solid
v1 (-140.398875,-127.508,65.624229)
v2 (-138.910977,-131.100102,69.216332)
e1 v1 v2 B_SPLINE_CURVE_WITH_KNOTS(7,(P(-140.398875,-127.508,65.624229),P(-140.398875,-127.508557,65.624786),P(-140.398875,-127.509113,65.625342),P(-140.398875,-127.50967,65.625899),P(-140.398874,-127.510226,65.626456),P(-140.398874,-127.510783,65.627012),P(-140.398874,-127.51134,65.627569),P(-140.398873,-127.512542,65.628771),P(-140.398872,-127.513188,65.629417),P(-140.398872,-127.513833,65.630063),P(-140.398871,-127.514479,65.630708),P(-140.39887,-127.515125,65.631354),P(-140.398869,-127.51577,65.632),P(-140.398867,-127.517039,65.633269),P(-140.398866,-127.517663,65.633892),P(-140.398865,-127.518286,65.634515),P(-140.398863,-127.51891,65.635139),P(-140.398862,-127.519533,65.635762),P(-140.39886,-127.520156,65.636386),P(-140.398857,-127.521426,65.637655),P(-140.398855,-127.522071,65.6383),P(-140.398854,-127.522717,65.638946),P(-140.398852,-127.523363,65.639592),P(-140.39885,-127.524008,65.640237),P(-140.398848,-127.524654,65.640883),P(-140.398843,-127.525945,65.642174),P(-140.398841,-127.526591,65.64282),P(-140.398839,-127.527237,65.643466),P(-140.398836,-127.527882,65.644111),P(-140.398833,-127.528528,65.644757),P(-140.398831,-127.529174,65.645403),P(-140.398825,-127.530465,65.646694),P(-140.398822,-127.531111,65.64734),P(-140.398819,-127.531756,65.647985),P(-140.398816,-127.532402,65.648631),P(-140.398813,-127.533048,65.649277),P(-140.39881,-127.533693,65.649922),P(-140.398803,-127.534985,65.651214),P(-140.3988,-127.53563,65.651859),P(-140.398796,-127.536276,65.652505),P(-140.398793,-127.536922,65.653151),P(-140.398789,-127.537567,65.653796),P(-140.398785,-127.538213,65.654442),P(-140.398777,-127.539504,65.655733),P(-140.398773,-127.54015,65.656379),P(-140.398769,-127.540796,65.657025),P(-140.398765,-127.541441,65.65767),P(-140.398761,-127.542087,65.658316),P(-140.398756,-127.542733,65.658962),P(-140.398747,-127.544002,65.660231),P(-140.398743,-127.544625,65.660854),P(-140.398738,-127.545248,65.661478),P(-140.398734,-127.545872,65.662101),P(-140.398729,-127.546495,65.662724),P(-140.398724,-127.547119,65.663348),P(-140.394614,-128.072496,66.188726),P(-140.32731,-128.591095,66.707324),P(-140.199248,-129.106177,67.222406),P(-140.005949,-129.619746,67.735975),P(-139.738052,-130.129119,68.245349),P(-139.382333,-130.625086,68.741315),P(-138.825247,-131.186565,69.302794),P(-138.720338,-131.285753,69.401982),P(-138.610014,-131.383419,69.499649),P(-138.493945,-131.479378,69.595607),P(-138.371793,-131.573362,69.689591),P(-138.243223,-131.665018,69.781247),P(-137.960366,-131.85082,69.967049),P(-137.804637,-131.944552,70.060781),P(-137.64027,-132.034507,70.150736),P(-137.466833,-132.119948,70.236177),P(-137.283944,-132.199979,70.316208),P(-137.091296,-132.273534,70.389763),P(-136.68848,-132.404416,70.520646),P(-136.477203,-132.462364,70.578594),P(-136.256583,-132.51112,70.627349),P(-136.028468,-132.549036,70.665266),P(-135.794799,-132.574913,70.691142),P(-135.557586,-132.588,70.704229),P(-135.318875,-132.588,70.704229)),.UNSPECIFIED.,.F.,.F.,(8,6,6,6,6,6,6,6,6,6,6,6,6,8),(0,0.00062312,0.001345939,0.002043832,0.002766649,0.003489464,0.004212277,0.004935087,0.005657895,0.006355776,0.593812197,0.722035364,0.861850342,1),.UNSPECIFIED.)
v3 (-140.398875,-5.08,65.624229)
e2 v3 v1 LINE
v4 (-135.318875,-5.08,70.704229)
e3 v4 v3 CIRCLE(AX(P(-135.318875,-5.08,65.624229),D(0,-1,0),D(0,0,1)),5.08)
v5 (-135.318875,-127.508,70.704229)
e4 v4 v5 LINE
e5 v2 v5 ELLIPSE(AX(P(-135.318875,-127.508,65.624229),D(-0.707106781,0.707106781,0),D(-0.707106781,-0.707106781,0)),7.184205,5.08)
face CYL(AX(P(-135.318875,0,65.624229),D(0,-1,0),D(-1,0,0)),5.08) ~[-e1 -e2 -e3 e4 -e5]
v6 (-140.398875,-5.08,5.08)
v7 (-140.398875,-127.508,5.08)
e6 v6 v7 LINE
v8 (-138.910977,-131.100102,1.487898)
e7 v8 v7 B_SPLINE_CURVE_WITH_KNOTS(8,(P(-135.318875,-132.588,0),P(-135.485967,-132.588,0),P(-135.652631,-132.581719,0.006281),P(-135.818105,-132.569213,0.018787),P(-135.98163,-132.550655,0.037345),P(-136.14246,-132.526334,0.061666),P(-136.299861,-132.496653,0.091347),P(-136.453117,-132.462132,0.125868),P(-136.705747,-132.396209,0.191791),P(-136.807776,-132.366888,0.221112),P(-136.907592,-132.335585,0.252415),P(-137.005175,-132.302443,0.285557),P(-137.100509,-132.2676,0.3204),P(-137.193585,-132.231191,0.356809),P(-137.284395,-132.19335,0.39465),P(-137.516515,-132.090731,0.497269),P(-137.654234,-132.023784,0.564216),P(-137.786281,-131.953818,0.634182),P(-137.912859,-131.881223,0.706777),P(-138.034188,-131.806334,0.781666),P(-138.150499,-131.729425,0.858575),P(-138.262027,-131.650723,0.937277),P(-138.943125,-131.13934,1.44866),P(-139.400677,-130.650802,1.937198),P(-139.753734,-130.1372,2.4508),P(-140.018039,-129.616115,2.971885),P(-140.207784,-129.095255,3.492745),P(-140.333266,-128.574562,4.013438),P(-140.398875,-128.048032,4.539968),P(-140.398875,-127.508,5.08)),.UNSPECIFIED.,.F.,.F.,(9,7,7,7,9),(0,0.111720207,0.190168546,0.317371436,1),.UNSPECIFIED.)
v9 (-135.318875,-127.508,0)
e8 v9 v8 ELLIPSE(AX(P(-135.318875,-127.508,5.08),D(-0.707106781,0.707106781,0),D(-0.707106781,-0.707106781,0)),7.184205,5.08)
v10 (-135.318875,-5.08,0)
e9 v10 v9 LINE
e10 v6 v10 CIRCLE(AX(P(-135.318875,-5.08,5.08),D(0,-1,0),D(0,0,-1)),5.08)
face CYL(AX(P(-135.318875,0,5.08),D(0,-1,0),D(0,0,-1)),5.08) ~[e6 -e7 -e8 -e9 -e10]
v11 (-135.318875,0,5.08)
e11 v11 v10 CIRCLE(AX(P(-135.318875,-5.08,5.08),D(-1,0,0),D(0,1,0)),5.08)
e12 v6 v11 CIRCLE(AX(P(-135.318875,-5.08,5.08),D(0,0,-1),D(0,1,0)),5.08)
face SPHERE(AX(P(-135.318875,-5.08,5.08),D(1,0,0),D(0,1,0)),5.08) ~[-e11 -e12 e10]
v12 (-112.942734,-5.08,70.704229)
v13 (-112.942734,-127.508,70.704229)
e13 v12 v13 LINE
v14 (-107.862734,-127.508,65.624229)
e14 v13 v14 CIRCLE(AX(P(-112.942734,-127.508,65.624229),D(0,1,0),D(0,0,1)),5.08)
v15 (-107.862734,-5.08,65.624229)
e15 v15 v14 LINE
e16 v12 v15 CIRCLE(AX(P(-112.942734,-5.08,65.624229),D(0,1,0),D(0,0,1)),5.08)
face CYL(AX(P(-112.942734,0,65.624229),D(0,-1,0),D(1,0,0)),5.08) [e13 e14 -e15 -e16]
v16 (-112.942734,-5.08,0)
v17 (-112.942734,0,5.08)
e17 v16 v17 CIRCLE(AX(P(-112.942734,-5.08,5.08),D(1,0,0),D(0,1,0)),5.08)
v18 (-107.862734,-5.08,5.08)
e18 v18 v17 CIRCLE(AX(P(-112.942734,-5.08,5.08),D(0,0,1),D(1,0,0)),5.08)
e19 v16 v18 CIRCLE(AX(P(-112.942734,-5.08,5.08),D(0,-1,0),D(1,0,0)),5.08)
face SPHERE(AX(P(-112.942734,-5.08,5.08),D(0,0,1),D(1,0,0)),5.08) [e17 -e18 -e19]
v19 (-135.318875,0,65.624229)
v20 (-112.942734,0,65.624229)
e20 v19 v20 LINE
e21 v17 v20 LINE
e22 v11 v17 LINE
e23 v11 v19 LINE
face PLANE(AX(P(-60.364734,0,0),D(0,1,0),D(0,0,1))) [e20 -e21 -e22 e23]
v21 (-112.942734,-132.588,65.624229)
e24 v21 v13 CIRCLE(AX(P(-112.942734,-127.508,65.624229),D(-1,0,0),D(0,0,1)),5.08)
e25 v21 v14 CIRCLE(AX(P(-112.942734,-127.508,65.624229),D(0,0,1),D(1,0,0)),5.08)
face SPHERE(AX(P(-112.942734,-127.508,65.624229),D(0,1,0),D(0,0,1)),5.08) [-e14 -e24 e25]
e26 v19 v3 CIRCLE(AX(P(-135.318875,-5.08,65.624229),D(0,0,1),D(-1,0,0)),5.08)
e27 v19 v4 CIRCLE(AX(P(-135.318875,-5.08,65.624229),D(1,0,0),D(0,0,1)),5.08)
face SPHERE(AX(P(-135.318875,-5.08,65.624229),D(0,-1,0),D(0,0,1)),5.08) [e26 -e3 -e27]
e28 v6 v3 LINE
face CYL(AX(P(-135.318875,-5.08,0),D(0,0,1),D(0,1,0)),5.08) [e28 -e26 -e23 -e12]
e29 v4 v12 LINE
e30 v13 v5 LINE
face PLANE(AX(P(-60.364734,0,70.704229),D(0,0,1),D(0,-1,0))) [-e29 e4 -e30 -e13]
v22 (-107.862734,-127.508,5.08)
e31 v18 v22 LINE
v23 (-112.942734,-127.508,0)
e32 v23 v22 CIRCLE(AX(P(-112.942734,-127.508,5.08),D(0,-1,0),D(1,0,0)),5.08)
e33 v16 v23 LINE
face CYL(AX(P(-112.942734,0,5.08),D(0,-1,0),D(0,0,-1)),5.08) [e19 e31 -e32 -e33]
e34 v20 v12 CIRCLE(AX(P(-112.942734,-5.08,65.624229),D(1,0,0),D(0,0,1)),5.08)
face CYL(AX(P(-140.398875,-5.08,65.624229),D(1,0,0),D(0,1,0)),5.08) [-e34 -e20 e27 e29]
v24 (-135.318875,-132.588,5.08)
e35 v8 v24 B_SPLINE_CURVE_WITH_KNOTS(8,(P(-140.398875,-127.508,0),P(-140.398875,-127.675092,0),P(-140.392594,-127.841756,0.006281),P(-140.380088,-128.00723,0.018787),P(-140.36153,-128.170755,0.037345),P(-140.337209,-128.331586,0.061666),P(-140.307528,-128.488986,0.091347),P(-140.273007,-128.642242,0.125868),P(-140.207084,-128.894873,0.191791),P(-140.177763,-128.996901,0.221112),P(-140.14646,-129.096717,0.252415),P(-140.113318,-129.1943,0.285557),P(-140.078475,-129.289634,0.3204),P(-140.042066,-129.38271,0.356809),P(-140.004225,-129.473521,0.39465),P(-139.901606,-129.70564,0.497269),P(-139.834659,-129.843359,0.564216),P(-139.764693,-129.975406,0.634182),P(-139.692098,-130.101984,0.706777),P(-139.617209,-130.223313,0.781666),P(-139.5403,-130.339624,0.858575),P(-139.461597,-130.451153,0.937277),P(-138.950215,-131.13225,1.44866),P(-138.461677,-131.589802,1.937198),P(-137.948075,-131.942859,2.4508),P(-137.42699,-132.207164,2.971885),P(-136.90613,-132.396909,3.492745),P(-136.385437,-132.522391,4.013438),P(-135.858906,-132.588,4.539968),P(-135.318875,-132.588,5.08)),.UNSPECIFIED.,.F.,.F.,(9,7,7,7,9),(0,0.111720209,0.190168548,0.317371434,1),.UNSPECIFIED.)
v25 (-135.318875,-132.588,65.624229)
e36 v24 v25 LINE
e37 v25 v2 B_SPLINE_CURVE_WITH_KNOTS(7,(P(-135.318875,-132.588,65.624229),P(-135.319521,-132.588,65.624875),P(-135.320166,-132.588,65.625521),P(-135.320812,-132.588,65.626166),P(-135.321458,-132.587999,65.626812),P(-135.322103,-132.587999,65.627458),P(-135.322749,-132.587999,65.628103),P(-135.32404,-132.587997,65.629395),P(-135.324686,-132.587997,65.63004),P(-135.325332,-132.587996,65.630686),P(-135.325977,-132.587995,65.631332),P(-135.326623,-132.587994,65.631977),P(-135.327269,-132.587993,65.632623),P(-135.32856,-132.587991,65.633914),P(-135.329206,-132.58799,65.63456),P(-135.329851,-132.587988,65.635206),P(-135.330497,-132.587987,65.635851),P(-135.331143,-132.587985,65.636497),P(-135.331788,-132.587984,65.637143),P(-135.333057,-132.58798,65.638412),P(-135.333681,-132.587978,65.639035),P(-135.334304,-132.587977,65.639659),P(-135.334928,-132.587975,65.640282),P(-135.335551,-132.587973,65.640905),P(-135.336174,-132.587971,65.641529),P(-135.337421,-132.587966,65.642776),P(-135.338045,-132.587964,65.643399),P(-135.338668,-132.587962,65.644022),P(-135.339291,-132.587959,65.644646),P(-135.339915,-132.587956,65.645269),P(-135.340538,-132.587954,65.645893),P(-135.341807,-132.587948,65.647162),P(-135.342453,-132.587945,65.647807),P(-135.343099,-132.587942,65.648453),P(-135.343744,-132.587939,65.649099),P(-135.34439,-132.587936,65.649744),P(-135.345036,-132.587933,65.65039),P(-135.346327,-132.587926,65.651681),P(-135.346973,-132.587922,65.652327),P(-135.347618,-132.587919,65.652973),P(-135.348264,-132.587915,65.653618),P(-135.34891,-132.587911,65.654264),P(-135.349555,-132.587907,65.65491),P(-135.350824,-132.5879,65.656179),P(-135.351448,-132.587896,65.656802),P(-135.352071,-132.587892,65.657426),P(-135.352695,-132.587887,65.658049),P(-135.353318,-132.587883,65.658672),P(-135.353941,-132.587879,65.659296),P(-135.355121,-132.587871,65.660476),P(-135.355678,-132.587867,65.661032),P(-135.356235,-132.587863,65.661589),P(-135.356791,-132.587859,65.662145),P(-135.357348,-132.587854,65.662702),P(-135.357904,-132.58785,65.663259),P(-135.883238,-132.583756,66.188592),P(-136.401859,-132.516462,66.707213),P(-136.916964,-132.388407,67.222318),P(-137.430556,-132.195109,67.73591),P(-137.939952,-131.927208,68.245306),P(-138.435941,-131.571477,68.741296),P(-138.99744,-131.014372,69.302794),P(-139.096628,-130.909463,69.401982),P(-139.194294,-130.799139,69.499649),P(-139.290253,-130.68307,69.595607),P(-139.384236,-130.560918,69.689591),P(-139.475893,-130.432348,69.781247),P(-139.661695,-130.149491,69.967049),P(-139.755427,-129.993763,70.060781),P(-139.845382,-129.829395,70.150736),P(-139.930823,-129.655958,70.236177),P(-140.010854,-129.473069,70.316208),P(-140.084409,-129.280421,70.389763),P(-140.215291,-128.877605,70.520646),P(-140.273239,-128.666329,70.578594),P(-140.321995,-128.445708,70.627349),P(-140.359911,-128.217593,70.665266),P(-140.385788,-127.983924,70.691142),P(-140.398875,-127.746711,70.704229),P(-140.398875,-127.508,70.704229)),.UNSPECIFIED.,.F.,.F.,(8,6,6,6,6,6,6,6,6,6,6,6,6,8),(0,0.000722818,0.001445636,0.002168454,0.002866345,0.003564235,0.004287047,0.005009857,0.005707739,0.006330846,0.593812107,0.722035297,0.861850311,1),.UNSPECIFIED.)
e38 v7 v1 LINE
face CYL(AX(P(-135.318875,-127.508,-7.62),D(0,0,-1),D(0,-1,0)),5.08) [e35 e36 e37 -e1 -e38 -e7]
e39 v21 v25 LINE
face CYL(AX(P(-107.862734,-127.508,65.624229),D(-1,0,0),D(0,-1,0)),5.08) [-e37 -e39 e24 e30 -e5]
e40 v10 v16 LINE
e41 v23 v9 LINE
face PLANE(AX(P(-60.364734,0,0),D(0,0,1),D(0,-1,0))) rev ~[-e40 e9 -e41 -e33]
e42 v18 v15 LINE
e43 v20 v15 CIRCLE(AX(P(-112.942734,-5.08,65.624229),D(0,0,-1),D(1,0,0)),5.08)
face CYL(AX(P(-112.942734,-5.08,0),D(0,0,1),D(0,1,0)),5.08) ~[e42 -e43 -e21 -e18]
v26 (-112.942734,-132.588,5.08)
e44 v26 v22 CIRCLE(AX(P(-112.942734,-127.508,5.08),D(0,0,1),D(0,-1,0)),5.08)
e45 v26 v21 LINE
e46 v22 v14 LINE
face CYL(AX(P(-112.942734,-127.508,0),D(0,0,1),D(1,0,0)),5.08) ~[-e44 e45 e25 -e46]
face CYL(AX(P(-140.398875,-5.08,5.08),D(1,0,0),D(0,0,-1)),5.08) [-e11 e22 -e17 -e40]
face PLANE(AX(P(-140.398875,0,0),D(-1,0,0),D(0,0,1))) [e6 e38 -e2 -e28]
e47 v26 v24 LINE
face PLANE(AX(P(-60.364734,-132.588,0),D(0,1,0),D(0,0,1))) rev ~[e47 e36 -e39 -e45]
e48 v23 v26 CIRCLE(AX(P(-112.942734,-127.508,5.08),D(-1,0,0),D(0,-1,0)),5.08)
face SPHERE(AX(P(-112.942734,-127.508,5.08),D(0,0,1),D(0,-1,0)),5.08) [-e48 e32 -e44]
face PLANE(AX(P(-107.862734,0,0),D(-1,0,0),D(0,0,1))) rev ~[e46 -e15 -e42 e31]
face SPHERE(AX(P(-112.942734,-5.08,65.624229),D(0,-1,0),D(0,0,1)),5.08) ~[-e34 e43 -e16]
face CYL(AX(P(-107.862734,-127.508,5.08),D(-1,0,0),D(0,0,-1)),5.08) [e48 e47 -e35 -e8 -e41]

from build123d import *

# Parameters (mm, degrees)
F0_W        = 80.0341404974
F0_H        = 70.704229176
F1_DEPTH    = 132.588
F2_DEPTH    = 48.006
F3_DEPTH    = 47.498
F4_R        = 5.08
F5_T1_DEPTH = 85.944229176


# Not quite as in the source:
# - a fillet or chamfer that OpenCascade refuses, or shapes differently, is made with other operations: its cross-section is extruded or revolved along the edge and cut away or added


with BuildPart() as f1:
    # F0 (on Front) → F1 (new body)
    with BuildSketch(Plane.XZ):
        with Locations((-100.3818046302, 35.352114588)):
            Rectangle(F0_W, F0_H)
    extrude(amount=F1_DEPTH)

    # F2 (add): a face of the model
    f2_faces = [f1.faces().sort_by_distance(p)[0] for p in [
        (-60.3647343814, -66.294, 35.352114588),
    ]]
    extrude(f2_faces, amount=-F2_DEPTH)

    # F3 (cut): a face of the model
    f3_faces = [f1.faces().sort_by_distance(p)[0] for p in [
        (-60.3647343814, -66.294, 35.352114588),
    ]]
    extrude(f3_faces, amount=-F3_DEPTH, mode=Mode.SUBTRACT)

    # F4
    f4_edges = [f1.edges().sort_by_distance(p)[0] for p in [
        (-107.862734, -66.294, 70.704229),
        (-124.130805, -132.588, 70.704229),
        (-140.398875, -66.294, 70.704229),
        (-124.130805, 0, 70.704229),
        (-107.862734, -132.588, 35.352115),
        (-124.130805, -132.588, 0),
        (-107.862734, 0, 35.352115),
        (-107.862734, -66.294, 0),
        (-124.130805, 0, 0),
        (-140.398875, 0, 35.352115),
        (-140.398875, -66.294, 0),
    ]]
    fillet(f4_edges, radius=F4_R)

    # F5: fillet of radius 5.08 on 4 edges, made by hand

    # F5_s2 → F5_t1 (cut)
    with BuildSketch(Plane.XY.offset(-7.62)):
        with BuildLine():
            ThreePointArc((-135.3188748789, -132.588), (-138.9109773273, -131.1001024484), (-140.3988748789, -127.508))
            Line((-140.3988748789, -127.508), (-140.3988748789, -132.588))
            Line((-140.3988748789, -132.588), (-135.3188748789, -132.588))
        make_face()
    extrude(amount=F5_T1_DEPTH, mode=Mode.SUBTRACT)


solid = f1.part
